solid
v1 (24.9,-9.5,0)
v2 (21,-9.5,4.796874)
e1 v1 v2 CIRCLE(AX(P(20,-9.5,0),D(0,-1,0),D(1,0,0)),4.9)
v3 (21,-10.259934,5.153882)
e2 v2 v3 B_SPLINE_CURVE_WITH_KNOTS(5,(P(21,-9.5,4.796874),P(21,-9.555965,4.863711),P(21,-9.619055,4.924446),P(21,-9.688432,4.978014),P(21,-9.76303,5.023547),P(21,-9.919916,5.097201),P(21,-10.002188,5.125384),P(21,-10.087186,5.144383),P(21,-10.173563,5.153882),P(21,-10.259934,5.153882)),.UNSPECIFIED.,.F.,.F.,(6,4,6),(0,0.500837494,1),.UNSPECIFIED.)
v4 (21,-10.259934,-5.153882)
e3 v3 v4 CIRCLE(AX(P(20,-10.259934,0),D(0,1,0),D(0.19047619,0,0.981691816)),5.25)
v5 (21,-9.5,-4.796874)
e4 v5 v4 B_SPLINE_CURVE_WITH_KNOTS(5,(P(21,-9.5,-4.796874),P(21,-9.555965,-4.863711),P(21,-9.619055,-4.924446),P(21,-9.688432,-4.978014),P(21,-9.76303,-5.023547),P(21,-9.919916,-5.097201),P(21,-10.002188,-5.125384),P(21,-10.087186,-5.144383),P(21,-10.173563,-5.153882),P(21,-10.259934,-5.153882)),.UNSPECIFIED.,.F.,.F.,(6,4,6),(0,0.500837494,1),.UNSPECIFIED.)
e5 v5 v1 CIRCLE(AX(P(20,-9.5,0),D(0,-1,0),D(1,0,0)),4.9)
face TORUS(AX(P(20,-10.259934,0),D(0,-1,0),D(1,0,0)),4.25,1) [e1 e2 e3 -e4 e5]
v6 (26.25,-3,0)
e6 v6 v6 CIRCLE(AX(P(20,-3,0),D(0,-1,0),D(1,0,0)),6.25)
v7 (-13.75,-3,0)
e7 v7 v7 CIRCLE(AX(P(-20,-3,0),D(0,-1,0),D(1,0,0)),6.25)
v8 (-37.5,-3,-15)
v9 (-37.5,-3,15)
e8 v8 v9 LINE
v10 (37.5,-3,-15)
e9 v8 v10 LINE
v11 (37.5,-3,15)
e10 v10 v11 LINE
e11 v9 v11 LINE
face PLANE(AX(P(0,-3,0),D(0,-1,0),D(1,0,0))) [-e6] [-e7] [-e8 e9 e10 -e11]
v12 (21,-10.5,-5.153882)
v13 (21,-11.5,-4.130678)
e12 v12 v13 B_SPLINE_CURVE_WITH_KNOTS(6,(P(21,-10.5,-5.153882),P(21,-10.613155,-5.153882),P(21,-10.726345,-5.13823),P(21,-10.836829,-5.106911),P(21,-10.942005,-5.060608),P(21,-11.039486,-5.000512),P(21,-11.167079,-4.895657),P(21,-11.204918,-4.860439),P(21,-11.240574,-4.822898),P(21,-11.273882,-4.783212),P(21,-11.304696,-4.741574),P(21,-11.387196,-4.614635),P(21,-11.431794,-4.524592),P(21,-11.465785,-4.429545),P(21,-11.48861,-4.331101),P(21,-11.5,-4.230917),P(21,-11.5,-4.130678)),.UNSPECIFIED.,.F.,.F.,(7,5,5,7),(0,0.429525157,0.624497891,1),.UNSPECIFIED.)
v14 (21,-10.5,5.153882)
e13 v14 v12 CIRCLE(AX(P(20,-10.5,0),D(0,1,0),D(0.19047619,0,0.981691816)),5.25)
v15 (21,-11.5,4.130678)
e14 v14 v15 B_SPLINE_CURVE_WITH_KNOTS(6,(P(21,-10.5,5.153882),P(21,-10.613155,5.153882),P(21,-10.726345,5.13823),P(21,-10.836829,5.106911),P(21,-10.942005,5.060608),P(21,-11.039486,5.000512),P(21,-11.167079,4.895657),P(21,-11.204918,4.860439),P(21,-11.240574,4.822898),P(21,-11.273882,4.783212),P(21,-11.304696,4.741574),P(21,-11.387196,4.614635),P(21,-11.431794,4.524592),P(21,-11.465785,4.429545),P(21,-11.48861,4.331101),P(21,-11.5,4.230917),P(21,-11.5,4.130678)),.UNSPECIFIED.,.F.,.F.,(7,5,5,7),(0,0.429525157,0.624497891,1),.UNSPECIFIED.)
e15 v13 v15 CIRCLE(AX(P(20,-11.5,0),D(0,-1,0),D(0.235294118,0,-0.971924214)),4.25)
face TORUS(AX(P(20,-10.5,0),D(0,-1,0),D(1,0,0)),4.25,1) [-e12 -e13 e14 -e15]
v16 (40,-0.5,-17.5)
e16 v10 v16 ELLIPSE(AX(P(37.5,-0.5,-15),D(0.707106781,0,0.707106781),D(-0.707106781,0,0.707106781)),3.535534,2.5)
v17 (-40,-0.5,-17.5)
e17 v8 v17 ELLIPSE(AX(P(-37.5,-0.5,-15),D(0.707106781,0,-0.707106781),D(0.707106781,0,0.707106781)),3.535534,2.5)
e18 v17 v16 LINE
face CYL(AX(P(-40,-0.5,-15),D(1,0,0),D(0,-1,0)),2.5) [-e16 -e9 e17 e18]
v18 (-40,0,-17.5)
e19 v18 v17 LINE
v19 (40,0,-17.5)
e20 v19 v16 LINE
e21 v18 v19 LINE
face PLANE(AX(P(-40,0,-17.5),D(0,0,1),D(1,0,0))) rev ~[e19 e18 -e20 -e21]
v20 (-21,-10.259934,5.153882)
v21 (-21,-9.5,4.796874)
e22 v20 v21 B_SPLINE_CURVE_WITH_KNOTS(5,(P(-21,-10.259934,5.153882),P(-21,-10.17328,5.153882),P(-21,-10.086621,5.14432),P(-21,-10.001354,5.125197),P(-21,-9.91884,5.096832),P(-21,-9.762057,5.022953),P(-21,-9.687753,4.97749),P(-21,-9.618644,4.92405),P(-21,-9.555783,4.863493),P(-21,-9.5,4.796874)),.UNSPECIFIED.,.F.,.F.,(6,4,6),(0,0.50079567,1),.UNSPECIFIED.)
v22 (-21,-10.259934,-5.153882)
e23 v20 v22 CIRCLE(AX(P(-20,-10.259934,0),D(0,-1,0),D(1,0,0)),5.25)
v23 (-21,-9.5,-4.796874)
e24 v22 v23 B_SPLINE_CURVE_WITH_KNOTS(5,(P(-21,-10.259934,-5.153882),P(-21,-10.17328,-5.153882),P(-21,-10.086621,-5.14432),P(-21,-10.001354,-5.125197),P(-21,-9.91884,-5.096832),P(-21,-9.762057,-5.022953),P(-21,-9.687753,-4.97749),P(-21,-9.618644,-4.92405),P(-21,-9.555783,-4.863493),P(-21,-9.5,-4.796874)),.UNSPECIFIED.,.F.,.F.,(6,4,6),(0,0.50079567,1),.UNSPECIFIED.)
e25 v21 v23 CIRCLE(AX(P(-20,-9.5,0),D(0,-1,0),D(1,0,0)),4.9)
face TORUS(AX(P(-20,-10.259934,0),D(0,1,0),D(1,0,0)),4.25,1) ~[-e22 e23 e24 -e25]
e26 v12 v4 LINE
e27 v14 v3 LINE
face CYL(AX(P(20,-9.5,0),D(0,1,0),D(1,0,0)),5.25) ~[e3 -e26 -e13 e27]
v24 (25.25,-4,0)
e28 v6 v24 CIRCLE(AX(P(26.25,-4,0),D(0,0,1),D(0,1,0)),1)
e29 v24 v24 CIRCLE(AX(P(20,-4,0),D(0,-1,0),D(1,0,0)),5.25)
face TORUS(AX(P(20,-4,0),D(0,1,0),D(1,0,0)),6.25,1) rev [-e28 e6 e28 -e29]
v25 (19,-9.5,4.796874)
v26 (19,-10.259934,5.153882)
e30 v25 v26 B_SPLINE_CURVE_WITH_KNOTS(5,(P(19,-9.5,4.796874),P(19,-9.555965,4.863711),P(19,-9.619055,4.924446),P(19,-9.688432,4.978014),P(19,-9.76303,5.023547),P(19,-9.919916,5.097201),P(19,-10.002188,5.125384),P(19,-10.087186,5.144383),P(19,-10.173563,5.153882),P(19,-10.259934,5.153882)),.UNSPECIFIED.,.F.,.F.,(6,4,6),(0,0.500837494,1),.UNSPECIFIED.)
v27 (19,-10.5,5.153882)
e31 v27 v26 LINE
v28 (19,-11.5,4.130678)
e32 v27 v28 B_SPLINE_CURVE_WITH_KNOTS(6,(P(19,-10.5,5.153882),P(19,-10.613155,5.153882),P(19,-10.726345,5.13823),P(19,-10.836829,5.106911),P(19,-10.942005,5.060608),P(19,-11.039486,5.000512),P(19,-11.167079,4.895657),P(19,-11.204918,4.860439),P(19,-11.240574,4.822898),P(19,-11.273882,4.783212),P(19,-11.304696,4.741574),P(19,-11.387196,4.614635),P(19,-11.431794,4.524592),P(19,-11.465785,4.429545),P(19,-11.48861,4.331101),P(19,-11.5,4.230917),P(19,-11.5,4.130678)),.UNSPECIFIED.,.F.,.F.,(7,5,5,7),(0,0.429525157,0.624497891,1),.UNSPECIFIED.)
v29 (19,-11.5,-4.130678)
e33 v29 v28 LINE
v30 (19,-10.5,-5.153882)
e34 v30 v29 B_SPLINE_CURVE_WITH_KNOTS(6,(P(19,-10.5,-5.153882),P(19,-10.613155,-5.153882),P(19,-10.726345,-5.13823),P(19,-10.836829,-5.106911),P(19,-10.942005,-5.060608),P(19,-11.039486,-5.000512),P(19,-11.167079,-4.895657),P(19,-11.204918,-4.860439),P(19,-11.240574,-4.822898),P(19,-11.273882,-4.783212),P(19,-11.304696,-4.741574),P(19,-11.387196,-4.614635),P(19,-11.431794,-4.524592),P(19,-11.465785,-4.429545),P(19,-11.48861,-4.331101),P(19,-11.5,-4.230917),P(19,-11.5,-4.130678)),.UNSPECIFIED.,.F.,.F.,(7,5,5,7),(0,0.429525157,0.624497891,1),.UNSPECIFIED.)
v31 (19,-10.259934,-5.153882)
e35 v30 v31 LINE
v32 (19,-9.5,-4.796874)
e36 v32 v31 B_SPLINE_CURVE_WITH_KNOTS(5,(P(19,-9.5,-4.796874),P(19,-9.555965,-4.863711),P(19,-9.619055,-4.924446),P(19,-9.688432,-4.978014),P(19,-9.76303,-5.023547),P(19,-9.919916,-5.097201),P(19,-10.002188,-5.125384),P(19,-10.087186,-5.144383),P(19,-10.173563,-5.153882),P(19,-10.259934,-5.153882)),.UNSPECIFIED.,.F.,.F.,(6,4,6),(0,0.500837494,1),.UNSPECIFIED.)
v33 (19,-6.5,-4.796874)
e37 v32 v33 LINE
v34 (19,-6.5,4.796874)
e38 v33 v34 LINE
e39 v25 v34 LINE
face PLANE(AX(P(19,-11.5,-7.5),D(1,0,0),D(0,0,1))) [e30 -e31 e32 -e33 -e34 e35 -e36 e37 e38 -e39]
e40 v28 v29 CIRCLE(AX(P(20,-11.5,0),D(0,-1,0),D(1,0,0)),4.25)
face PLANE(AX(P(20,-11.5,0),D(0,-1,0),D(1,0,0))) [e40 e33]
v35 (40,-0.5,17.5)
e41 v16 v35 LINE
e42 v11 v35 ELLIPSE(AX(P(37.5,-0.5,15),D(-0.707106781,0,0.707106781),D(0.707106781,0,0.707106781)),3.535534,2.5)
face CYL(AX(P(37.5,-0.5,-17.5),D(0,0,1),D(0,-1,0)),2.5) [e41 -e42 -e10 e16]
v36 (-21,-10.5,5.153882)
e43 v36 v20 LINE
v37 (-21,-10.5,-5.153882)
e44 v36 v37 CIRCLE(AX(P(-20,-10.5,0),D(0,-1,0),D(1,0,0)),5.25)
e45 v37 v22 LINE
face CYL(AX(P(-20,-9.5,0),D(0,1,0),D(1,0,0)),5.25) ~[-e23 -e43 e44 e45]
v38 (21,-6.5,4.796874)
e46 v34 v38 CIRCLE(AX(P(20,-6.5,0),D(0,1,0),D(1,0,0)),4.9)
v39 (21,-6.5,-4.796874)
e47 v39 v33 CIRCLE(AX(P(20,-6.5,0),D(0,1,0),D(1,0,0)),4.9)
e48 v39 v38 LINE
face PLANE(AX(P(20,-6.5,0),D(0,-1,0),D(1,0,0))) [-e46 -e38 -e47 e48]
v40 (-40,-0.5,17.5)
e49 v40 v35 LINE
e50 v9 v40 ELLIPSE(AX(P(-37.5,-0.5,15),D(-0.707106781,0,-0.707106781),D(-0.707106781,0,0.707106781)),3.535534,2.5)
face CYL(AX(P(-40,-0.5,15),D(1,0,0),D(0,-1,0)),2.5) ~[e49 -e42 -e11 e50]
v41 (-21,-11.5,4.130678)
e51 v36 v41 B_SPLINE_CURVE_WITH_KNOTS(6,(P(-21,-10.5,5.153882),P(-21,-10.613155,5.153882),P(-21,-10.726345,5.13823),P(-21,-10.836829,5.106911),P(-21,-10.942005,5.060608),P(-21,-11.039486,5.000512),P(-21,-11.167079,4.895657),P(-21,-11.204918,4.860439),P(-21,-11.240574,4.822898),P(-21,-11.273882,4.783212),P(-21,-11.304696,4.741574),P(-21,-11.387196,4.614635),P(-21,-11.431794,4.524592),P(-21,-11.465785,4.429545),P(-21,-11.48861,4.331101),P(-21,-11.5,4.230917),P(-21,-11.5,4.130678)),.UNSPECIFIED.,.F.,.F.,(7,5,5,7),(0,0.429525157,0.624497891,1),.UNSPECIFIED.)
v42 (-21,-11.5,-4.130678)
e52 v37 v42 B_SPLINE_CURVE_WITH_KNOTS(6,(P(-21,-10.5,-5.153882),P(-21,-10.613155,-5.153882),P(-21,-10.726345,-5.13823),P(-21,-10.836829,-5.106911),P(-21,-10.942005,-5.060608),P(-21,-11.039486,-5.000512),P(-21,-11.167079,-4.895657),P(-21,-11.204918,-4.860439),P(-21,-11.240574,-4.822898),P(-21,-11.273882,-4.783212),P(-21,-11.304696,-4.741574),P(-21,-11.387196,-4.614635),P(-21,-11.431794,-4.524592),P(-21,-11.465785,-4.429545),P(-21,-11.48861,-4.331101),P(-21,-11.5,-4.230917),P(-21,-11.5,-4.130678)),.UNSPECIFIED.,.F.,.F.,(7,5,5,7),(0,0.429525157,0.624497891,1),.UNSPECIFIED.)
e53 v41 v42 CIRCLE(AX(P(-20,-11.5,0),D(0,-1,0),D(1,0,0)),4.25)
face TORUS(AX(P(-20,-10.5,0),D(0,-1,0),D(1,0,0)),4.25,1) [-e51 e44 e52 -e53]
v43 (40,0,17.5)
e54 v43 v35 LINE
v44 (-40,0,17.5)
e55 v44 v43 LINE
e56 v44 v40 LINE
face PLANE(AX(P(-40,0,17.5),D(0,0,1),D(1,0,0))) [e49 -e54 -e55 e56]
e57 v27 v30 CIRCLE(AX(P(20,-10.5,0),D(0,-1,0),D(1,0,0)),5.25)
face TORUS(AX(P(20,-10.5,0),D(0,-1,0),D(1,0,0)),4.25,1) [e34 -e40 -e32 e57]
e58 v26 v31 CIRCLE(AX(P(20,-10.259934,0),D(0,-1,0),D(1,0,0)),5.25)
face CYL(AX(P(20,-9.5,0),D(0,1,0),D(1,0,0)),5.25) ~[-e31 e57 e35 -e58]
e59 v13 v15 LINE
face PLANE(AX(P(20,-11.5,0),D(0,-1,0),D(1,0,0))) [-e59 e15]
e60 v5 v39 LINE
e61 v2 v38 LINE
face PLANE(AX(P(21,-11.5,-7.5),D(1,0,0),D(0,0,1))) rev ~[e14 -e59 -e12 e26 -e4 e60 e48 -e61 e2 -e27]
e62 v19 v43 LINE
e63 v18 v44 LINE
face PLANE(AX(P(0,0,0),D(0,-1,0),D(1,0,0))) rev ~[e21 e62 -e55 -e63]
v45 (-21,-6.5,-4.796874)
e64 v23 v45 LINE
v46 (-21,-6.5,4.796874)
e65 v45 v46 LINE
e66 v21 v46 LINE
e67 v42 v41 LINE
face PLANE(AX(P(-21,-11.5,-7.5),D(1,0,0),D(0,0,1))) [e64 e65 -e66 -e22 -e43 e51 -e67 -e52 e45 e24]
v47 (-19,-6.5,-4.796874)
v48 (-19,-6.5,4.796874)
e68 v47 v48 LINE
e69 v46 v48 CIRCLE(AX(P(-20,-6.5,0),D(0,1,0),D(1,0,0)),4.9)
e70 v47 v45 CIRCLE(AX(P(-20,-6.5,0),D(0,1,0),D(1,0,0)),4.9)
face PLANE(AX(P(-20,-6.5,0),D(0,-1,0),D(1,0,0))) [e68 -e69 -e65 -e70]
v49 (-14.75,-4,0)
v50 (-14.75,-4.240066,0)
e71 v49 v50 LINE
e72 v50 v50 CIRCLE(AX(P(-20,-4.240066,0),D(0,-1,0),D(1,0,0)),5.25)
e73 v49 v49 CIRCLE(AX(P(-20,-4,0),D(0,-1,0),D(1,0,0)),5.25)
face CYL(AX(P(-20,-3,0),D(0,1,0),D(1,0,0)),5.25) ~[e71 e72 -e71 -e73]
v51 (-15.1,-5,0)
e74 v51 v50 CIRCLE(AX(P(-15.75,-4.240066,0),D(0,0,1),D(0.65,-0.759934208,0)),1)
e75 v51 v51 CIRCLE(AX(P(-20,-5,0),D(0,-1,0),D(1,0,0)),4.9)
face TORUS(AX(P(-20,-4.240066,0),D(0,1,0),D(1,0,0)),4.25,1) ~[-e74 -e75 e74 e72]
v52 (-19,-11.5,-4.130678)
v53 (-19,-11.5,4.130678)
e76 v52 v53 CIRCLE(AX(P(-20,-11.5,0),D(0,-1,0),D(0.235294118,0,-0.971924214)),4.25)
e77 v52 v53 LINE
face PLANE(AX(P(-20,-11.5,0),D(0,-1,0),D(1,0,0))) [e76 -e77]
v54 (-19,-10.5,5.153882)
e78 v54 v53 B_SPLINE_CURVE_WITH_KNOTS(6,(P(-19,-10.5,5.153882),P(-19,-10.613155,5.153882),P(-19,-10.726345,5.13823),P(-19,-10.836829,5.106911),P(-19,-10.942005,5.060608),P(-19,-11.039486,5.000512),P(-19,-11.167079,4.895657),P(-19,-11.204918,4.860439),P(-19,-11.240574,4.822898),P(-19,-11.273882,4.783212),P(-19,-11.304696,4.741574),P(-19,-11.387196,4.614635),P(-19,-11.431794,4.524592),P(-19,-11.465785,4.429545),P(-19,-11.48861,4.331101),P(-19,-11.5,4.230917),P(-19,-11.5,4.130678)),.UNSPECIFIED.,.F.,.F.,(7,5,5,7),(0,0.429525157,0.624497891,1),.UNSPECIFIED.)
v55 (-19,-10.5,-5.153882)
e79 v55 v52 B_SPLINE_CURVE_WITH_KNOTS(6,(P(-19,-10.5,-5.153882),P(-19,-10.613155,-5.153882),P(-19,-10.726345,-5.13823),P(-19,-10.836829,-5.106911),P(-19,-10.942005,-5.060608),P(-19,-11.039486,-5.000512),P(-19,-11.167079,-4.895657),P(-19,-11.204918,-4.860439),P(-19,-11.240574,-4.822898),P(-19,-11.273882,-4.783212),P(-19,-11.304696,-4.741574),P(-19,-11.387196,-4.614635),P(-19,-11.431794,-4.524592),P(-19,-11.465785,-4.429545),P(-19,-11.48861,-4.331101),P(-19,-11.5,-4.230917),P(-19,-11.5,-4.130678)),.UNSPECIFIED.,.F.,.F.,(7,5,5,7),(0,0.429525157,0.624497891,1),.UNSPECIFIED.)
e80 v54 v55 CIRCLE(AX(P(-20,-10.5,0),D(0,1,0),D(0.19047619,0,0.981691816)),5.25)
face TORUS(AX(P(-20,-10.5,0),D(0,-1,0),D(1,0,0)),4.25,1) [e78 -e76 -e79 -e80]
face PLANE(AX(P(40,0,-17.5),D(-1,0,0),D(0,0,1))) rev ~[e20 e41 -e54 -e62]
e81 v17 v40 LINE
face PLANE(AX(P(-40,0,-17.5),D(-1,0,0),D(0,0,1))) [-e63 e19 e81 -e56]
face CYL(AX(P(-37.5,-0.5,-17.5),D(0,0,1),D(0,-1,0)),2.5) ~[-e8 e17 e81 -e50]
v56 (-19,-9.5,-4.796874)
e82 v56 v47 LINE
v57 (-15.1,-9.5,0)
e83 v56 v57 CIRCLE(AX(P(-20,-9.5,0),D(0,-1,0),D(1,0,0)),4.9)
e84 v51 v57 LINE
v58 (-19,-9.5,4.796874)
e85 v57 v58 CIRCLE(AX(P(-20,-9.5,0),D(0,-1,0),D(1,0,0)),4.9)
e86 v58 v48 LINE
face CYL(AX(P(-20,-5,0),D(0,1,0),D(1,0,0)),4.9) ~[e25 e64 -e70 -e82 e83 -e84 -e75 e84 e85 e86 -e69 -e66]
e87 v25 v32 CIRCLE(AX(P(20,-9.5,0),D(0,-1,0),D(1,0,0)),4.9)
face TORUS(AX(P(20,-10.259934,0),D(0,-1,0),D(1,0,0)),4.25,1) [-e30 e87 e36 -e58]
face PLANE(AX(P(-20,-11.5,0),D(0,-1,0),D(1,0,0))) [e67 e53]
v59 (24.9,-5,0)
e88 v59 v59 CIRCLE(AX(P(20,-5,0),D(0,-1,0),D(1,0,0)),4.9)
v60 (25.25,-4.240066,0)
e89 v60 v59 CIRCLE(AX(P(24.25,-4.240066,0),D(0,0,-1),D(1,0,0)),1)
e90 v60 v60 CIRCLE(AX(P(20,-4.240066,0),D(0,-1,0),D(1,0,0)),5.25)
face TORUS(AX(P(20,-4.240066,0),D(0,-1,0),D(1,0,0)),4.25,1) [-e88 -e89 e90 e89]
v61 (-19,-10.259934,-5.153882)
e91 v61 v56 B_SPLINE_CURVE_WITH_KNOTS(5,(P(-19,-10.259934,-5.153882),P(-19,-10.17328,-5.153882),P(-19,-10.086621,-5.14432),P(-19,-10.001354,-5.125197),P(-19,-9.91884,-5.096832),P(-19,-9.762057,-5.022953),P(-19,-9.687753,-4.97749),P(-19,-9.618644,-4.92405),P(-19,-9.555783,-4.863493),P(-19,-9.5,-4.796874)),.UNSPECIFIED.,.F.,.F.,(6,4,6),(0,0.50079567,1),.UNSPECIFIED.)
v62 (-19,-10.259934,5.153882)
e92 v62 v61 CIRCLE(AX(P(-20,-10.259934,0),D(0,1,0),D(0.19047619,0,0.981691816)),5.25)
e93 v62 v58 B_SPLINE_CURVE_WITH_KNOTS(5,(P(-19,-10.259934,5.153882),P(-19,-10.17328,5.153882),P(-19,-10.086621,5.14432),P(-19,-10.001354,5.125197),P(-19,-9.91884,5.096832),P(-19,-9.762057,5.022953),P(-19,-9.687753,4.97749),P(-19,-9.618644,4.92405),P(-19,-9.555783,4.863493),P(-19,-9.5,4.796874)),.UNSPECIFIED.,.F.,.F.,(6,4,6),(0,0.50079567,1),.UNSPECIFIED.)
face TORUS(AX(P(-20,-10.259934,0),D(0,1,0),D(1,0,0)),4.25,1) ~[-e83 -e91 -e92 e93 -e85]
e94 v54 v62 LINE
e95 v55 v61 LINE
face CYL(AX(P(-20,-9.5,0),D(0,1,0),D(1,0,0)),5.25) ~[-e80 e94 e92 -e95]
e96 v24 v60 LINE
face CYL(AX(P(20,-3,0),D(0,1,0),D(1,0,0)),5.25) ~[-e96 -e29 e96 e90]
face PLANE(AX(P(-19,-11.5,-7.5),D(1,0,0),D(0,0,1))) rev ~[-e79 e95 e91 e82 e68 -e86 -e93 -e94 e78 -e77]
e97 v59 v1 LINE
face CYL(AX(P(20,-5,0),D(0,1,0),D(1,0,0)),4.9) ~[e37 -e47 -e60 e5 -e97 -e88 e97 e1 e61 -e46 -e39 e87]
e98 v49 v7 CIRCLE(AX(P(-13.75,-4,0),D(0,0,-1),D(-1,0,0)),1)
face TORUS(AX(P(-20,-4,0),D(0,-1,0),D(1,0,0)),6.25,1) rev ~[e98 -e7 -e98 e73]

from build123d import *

# Parameters (mm, degrees)
F0_W      = 80
F0_H      = 35
F1_DEPTH  = 3
F2_R      = 5.25
F3_DEPTH  = 2
F4_R      = 4.9
F5_DEPTH  = 4.5
F6_R      = 5.25
F7_DEPTH  = 2
F9_W      = 2
F9_H      = 15
F10_DEPTH = 5
F11_R     = 2.5


# Not quite as in the source:
# - a fillet or chamfer that OpenCascade refuses, or shapes differently, is made with other operations: its cross-section is extruded or revolved along the edge and cut away or added


with BuildPart() as f1:
    # F0 (on Front) → F1 (new body)
    with BuildSketch(Plane.XZ):
        Rectangle(F0_W, F0_H)
    extrude(amount=F1_DEPTH)

    # F2 (on face) → F3 (join)
    with BuildSketch(Plane.XZ.offset(3)):
        with Locations((-20, 0)):
            Circle(F2_R)
        with Locations((20, 0)):
            Circle(F2_R)
    extrude(amount=F3_DEPTH)

    # F4 (on face) → F5 (join)
    with BuildSketch(Plane.XZ.offset(5)):
        with Locations((-20, 0)):
            Circle(F4_R)
        with Locations((20, 0)):
            Circle(F4_R)
    extrude(amount=F5_DEPTH)

    # F6 (on face) → F7 (join)
    with BuildSketch(Plane.XZ.offset(9.5)):
        with Locations((-20, 0)):
            Circle(F6_R)
        with Locations((20, 0)):
            Circle(F6_R)
    extrude(amount=F7_DEPTH)

    # F8: fillet of radius 1 on 8 edges, made by hand

    # F8_s1 → F8_t2 (revolve)
    with BuildSketch(Plane.XY):
        with BuildLine():
            ThreePointArc((-14.75, -4), (-14.4571067812, -3.2928932188), (-13.75, -3))
            Line((-13.75, -3), (-14.75, -3))
            Line((-14.75, -3), (-14.75, -4))
        make_face()
    revolve(axis=Axis((-20, -3, 0), (0, -1, 0)))

    # F8_s3 → F8_t4 (revolve)
    with BuildSketch(Plane.XY):
        with BuildLine():
            ThreePointArc((26.25, -3), (25.5428932188, -3.2928932188), (25.25, -4))
            Line((25.25, -4), (25.25, -3))
            Line((25.25, -3), (26.25, -3))
        make_face()
    revolve(axis=Axis((20, -3, 0), (0, -1, 0)))

    # F8_s5 → F8_t6 (revolve, cut)
    with BuildSketch(Plane.XY):
        with BuildLine():
            ThreePointArc((-14.75, -10.2599342077), (-14.8417048938, -9.8416041944), (-15.1, -9.5))
            Line((-15.1, -9.5), (-14.75, -9.5))
            Line((-14.75, -9.5), (-14.75, -10.2599342077))
        make_face()
    revolve(axis=Axis((-20, -9.5, 0), (0, -1, 0)), mode=Mode.SUBTRACT)

    # F8_s7 → F8_t8 (revolve, cut)
    with BuildSketch(Plane.XY):
        with BuildLine():
            ThreePointArc((-14.75, -10.5), (-15.0428932188, -11.2071067812), (-15.75, -11.5))
            Line((-15.75, -11.5), (-14.75, -11.5))
            Line((-14.75, -11.5), (-14.75, -10.5))
        make_face()
    revolve(axis=Axis((-20, -11.5, 0), (0, -1, 0)), mode=Mode.SUBTRACT)

    # F8_s9 → F8_t10 (revolve, cut)
    with BuildSketch(Plane.XY):
        with BuildLine():
            ThreePointArc((-15.1, -5), (-14.8417048938, -4.6583958056), (-14.75, -4.2400657923))
            Line((-14.75, -4.2400657923), (-14.75, -5))
            Line((-14.75, -5), (-15.1, -5))
        make_face()
    revolve(axis=Axis((-20, -5, 0), (0, -1, 0)), mode=Mode.SUBTRACT)

    # F8_s11 → F8_t12 (revolve, cut)
    with BuildSketch(Plane.XY):
        with BuildLine():
            ThreePointArc((25.25, -4.2400657923), (25.1582951062, -4.6583958056), (24.9, -5))
            Line((24.9, -5), (25.25, -5))
            Line((25.25, -5), (25.25, -4.2400657923))
        make_face()
    revolve(axis=Axis((20, -5, 0), (0, -1, 0)), mode=Mode.SUBTRACT)

    # F8_s13 → F8_t14 (revolve, cut)
    with BuildSketch(Plane.XY):
        with BuildLine():
            ThreePointArc((24.9, -9.5), (25.1582951062, -9.8416041944), (25.25, -10.2599342077))
            Line((25.25, -10.2599342077), (25.25, -9.5))
            Line((25.25, -9.5), (24.9, -9.5))
        make_face()
    revolve(axis=Axis((20, -9.5, 0), (0, -1, 0)), mode=Mode.SUBTRACT)

    # F8_s15 → F8_t16 (revolve, cut)
    with BuildSketch(Plane.XY):
        with BuildLine():
            ThreePointArc((25.25, -10.5), (24.9571067812, -11.2071067812), (24.25, -11.5))
            Line((24.25, -11.5), (25.25, -11.5))
            Line((25.25, -11.5), (25.25, -10.5))
        make_face()
    revolve(axis=Axis((20, -11.5, 0), (0, -1, 0)), mode=Mode.SUBTRACT)

    # F9 (on face) → F10 (cut)
    with BuildSketch(Plane.XZ.offset(11.5)):
        with Locations((-20, 0)):
            Rectangle(F9_W, F9_H)
        with Locations((20, 0)):
            Rectangle(F9_W, F9_H)
    extrude(amount=-F10_DEPTH, mode=Mode.SUBTRACT)

    # F11
    f11_edges = [f1.edges().sort_by_distance(p)[0] for p in [
        (-40, -3, 0),
        (0, -3, 17.5),
        (40, -3, 0),
        (0, -3, -17.5),
    ]]
    fillet(f11_edges, radius=F11_R)


solid = f1.part
